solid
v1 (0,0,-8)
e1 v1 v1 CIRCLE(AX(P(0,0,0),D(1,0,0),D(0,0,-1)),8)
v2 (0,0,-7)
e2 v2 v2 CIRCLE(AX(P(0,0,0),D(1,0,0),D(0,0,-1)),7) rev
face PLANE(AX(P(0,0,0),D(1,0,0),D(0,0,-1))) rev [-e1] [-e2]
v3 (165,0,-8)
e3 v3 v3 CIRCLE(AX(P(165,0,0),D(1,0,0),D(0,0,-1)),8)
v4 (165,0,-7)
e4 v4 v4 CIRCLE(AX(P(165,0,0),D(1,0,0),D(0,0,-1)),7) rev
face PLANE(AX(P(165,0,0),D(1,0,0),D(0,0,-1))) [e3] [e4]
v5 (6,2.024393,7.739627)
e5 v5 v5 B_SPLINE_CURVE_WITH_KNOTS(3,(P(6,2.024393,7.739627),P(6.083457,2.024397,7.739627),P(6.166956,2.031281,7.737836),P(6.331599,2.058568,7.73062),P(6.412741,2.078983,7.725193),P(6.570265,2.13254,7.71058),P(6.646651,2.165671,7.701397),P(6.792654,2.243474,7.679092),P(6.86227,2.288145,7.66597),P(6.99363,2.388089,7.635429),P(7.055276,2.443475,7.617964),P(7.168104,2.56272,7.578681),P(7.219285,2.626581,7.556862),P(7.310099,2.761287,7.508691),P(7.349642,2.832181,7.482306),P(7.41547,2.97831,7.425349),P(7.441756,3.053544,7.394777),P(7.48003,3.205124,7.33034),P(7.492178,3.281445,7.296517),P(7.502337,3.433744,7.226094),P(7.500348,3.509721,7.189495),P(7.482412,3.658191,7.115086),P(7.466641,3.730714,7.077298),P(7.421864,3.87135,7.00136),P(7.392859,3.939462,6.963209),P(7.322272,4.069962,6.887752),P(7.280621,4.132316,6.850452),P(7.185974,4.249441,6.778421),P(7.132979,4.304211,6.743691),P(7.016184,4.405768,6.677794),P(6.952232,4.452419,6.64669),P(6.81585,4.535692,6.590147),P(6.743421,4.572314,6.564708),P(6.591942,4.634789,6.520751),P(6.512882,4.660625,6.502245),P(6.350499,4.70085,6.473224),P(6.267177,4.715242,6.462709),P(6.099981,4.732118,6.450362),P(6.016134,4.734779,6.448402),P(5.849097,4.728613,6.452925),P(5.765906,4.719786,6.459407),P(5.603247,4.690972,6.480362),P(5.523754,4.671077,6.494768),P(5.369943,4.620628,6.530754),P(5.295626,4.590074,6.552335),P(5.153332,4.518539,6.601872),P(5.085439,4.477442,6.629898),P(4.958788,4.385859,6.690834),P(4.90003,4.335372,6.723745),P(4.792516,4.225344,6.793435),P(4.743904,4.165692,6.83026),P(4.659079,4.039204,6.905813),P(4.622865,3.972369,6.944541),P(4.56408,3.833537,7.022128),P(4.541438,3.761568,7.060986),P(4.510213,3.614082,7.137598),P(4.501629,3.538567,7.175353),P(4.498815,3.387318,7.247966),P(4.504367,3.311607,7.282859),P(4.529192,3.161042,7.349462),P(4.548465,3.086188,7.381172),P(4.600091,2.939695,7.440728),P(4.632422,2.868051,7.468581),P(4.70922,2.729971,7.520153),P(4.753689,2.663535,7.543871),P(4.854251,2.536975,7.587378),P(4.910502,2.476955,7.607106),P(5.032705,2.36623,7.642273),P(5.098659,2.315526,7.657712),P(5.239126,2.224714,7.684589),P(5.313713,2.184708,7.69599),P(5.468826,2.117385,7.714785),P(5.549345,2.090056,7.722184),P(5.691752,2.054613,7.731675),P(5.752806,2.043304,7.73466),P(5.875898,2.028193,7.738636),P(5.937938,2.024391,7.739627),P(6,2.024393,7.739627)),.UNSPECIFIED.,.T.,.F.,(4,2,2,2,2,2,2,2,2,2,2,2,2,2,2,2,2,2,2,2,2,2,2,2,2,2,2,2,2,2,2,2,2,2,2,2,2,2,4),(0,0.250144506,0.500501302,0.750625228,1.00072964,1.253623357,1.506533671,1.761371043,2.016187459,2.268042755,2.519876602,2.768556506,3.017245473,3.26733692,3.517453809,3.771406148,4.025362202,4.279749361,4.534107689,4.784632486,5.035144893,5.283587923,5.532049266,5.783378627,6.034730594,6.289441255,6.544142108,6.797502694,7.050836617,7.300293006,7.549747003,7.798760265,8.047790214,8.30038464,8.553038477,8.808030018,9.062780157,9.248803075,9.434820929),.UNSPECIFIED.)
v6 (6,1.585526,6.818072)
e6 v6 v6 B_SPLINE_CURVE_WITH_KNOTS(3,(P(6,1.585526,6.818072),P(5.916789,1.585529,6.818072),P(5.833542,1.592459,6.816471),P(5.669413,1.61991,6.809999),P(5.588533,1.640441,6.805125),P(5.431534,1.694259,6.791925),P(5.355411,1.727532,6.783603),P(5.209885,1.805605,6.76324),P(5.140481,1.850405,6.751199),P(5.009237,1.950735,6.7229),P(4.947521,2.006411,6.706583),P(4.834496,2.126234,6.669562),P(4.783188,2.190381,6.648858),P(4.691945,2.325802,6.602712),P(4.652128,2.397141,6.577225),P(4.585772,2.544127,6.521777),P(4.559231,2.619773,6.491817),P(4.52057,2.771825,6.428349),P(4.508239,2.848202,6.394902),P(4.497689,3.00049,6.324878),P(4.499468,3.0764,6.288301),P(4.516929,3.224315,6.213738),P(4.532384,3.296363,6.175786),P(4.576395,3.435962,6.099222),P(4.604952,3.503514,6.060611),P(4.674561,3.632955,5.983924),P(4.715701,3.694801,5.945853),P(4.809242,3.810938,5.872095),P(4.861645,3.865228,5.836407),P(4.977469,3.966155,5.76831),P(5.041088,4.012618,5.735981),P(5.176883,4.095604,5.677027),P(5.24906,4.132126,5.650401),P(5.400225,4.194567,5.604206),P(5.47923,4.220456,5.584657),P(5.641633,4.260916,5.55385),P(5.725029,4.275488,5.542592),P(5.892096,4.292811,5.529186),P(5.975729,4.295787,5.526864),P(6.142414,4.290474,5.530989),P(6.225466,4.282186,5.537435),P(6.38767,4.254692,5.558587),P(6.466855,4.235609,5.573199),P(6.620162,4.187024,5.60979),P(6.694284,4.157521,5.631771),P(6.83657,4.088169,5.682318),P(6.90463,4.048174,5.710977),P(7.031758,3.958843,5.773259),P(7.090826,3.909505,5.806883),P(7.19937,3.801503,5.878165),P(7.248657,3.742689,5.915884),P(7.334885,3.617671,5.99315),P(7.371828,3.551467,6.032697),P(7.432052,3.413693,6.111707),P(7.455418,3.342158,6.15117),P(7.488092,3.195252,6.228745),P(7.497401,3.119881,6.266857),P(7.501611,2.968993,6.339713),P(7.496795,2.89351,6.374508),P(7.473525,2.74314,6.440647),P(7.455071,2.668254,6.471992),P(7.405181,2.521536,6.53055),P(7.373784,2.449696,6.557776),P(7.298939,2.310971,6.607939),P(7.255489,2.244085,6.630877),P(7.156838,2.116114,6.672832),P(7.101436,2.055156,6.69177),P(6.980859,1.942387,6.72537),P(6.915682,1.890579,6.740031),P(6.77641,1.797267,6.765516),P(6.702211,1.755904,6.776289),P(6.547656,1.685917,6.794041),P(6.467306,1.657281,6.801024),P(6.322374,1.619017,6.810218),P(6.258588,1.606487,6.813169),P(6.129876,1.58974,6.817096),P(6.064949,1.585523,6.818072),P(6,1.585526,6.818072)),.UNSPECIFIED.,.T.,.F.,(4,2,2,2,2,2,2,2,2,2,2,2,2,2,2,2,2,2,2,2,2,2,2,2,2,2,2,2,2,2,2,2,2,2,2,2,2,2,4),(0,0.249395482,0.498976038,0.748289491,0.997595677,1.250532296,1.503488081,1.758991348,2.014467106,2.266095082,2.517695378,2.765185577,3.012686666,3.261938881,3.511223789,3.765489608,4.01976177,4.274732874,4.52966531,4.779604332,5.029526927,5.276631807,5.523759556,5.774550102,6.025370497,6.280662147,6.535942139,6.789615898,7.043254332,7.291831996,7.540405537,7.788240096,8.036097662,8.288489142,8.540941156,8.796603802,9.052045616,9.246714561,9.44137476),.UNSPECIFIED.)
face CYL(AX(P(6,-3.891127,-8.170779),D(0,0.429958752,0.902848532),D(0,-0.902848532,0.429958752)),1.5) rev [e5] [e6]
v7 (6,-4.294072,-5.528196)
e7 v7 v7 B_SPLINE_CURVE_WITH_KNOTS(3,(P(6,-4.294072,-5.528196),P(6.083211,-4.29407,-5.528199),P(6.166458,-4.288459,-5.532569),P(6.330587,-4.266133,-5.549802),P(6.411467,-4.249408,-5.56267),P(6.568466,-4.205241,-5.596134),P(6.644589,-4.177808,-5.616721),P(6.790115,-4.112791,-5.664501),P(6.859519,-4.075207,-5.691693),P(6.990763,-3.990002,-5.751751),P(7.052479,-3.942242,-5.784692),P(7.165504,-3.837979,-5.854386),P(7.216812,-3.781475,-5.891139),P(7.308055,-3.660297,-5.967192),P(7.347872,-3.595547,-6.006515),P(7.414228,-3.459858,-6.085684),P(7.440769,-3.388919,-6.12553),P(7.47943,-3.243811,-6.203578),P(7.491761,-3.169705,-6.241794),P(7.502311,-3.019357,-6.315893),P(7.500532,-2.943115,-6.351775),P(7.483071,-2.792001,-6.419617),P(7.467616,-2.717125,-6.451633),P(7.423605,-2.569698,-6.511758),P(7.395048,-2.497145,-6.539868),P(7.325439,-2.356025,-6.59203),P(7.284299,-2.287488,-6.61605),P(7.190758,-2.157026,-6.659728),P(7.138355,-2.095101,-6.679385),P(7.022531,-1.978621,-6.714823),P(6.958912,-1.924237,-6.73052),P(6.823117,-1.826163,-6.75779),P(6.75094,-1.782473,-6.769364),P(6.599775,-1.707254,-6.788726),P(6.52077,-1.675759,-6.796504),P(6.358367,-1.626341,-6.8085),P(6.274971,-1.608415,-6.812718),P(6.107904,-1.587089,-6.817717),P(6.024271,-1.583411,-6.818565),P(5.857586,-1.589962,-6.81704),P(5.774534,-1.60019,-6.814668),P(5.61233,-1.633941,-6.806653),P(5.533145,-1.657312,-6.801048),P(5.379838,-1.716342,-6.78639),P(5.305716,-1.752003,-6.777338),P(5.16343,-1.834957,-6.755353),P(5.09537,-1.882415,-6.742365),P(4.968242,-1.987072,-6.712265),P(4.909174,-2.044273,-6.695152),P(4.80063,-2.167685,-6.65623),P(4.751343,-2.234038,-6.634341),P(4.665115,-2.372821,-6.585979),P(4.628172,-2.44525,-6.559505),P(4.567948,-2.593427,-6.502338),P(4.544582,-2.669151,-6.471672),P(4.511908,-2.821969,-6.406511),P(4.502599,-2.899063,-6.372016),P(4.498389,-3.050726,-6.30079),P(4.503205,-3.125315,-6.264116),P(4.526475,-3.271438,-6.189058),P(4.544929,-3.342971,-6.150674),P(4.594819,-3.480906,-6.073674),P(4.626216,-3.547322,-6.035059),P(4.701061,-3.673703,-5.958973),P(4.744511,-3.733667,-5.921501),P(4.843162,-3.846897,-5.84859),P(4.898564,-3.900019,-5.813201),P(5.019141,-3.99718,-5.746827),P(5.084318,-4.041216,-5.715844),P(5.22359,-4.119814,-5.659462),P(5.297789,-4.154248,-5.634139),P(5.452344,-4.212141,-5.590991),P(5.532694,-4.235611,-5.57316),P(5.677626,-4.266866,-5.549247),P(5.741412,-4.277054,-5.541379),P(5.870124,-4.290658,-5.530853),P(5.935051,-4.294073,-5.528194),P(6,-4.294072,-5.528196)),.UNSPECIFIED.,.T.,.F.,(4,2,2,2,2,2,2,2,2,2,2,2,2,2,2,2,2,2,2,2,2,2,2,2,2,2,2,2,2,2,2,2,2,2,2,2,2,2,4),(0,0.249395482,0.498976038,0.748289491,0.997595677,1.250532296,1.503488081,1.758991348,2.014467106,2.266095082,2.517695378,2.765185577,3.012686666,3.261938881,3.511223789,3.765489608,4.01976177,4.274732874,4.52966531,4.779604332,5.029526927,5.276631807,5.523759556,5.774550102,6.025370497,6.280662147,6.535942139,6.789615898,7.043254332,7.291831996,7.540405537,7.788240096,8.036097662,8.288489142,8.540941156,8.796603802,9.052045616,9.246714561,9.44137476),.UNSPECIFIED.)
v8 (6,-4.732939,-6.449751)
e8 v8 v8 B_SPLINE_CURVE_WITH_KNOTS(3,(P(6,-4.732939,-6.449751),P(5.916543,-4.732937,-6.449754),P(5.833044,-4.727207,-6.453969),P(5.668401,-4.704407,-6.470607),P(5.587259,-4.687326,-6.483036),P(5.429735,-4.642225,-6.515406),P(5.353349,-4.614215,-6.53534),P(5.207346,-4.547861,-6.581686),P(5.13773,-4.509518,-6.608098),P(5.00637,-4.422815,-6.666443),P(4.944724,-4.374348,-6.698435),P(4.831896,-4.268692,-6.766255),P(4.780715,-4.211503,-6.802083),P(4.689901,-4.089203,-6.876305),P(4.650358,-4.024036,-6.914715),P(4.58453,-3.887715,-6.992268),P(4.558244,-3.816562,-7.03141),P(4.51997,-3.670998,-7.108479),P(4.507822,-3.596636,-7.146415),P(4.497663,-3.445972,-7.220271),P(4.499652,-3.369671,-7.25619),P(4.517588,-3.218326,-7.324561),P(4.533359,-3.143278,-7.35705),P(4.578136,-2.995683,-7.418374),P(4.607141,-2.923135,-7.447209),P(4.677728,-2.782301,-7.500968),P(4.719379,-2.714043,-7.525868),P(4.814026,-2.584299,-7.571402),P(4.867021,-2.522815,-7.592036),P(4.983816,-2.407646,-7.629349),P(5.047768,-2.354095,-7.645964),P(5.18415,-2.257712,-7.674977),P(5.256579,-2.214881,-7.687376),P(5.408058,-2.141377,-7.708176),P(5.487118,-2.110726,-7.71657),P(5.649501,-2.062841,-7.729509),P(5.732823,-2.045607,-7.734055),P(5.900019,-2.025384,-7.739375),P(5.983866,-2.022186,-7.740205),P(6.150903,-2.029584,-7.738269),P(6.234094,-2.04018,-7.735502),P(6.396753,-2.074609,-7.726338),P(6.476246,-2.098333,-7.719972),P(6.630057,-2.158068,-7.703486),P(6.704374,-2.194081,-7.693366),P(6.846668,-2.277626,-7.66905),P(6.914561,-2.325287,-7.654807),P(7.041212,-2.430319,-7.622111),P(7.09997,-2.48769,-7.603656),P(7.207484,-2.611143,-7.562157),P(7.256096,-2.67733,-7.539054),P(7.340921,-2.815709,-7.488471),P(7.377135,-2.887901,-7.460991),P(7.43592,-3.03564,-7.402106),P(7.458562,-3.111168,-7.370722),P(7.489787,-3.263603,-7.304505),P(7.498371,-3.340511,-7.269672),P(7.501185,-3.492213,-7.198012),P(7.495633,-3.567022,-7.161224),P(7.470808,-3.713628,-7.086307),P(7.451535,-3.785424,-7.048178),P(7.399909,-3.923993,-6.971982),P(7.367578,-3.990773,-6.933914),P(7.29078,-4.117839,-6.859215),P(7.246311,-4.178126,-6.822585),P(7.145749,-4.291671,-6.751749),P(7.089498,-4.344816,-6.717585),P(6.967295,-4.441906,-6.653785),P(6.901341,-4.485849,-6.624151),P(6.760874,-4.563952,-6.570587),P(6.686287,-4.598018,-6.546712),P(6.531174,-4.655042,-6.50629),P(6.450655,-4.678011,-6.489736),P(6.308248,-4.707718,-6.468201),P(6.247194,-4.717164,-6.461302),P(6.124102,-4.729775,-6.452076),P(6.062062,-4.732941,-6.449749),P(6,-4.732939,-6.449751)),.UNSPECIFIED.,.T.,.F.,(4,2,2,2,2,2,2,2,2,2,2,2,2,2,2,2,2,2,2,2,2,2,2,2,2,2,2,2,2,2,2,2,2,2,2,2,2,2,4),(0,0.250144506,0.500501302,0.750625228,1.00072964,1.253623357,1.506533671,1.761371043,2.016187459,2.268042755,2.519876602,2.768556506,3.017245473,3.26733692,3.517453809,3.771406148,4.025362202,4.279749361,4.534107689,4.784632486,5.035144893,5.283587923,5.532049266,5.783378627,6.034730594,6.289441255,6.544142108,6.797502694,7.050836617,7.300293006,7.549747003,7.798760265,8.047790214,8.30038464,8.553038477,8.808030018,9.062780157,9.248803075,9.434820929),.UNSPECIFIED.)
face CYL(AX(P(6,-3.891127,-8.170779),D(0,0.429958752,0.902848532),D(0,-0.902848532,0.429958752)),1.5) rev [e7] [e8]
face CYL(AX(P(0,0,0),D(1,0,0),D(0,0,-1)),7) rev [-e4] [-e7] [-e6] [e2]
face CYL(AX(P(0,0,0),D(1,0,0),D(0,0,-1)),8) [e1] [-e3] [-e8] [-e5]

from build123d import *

# Parameters (mm, degrees)
SKETCH4_R              = 8
SKETCH4_R_2            = 7
CUT_EXTRUDE1_START     = -7.999999833
CUT_EXTRUDE1_OUTLINE_R = 1.5
CUT_EXTRUDE1_DEPTH     = 15.999999666


# Read off the part's stored shape, not the designer's step: Cut-Extrude1
with BuildPart() as part:
    # Sweep1: sweep along a path in Sketch2
    with BuildLine(Plane.XY) as sweep1_path:
        Line((0, 0), (165, 0))
    # Sketch4 → Sweep1 (sweep)
    with BuildSketch(Plane(origin=(0, 0, 0), x_dir=(0, 0, -1), z_dir=(1, 0, 0))):
        Circle(SKETCH4_R)
        Circle(SKETCH4_R_2, mode=Mode.SUBTRACT)
    sweep(path=sweep1_path.line)

    # Cut-Extrude1 outline → Cut-Extrude1 (cut)
    with BuildSketch(Plane(origin=(0, 0, 0), x_dir=(1, 0, 0), z_dir=(0, 0.42995875189106814, 0.9028485319655092)).offset(CUT_EXTRUDE1_START)):
        with Locations((6, 0)):
            Circle(CUT_EXTRUDE1_OUTLINE_R)
    extrude(amount=CUT_EXTRUDE1_DEPTH, mode=Mode.SUBTRACT)


solid = part.part
